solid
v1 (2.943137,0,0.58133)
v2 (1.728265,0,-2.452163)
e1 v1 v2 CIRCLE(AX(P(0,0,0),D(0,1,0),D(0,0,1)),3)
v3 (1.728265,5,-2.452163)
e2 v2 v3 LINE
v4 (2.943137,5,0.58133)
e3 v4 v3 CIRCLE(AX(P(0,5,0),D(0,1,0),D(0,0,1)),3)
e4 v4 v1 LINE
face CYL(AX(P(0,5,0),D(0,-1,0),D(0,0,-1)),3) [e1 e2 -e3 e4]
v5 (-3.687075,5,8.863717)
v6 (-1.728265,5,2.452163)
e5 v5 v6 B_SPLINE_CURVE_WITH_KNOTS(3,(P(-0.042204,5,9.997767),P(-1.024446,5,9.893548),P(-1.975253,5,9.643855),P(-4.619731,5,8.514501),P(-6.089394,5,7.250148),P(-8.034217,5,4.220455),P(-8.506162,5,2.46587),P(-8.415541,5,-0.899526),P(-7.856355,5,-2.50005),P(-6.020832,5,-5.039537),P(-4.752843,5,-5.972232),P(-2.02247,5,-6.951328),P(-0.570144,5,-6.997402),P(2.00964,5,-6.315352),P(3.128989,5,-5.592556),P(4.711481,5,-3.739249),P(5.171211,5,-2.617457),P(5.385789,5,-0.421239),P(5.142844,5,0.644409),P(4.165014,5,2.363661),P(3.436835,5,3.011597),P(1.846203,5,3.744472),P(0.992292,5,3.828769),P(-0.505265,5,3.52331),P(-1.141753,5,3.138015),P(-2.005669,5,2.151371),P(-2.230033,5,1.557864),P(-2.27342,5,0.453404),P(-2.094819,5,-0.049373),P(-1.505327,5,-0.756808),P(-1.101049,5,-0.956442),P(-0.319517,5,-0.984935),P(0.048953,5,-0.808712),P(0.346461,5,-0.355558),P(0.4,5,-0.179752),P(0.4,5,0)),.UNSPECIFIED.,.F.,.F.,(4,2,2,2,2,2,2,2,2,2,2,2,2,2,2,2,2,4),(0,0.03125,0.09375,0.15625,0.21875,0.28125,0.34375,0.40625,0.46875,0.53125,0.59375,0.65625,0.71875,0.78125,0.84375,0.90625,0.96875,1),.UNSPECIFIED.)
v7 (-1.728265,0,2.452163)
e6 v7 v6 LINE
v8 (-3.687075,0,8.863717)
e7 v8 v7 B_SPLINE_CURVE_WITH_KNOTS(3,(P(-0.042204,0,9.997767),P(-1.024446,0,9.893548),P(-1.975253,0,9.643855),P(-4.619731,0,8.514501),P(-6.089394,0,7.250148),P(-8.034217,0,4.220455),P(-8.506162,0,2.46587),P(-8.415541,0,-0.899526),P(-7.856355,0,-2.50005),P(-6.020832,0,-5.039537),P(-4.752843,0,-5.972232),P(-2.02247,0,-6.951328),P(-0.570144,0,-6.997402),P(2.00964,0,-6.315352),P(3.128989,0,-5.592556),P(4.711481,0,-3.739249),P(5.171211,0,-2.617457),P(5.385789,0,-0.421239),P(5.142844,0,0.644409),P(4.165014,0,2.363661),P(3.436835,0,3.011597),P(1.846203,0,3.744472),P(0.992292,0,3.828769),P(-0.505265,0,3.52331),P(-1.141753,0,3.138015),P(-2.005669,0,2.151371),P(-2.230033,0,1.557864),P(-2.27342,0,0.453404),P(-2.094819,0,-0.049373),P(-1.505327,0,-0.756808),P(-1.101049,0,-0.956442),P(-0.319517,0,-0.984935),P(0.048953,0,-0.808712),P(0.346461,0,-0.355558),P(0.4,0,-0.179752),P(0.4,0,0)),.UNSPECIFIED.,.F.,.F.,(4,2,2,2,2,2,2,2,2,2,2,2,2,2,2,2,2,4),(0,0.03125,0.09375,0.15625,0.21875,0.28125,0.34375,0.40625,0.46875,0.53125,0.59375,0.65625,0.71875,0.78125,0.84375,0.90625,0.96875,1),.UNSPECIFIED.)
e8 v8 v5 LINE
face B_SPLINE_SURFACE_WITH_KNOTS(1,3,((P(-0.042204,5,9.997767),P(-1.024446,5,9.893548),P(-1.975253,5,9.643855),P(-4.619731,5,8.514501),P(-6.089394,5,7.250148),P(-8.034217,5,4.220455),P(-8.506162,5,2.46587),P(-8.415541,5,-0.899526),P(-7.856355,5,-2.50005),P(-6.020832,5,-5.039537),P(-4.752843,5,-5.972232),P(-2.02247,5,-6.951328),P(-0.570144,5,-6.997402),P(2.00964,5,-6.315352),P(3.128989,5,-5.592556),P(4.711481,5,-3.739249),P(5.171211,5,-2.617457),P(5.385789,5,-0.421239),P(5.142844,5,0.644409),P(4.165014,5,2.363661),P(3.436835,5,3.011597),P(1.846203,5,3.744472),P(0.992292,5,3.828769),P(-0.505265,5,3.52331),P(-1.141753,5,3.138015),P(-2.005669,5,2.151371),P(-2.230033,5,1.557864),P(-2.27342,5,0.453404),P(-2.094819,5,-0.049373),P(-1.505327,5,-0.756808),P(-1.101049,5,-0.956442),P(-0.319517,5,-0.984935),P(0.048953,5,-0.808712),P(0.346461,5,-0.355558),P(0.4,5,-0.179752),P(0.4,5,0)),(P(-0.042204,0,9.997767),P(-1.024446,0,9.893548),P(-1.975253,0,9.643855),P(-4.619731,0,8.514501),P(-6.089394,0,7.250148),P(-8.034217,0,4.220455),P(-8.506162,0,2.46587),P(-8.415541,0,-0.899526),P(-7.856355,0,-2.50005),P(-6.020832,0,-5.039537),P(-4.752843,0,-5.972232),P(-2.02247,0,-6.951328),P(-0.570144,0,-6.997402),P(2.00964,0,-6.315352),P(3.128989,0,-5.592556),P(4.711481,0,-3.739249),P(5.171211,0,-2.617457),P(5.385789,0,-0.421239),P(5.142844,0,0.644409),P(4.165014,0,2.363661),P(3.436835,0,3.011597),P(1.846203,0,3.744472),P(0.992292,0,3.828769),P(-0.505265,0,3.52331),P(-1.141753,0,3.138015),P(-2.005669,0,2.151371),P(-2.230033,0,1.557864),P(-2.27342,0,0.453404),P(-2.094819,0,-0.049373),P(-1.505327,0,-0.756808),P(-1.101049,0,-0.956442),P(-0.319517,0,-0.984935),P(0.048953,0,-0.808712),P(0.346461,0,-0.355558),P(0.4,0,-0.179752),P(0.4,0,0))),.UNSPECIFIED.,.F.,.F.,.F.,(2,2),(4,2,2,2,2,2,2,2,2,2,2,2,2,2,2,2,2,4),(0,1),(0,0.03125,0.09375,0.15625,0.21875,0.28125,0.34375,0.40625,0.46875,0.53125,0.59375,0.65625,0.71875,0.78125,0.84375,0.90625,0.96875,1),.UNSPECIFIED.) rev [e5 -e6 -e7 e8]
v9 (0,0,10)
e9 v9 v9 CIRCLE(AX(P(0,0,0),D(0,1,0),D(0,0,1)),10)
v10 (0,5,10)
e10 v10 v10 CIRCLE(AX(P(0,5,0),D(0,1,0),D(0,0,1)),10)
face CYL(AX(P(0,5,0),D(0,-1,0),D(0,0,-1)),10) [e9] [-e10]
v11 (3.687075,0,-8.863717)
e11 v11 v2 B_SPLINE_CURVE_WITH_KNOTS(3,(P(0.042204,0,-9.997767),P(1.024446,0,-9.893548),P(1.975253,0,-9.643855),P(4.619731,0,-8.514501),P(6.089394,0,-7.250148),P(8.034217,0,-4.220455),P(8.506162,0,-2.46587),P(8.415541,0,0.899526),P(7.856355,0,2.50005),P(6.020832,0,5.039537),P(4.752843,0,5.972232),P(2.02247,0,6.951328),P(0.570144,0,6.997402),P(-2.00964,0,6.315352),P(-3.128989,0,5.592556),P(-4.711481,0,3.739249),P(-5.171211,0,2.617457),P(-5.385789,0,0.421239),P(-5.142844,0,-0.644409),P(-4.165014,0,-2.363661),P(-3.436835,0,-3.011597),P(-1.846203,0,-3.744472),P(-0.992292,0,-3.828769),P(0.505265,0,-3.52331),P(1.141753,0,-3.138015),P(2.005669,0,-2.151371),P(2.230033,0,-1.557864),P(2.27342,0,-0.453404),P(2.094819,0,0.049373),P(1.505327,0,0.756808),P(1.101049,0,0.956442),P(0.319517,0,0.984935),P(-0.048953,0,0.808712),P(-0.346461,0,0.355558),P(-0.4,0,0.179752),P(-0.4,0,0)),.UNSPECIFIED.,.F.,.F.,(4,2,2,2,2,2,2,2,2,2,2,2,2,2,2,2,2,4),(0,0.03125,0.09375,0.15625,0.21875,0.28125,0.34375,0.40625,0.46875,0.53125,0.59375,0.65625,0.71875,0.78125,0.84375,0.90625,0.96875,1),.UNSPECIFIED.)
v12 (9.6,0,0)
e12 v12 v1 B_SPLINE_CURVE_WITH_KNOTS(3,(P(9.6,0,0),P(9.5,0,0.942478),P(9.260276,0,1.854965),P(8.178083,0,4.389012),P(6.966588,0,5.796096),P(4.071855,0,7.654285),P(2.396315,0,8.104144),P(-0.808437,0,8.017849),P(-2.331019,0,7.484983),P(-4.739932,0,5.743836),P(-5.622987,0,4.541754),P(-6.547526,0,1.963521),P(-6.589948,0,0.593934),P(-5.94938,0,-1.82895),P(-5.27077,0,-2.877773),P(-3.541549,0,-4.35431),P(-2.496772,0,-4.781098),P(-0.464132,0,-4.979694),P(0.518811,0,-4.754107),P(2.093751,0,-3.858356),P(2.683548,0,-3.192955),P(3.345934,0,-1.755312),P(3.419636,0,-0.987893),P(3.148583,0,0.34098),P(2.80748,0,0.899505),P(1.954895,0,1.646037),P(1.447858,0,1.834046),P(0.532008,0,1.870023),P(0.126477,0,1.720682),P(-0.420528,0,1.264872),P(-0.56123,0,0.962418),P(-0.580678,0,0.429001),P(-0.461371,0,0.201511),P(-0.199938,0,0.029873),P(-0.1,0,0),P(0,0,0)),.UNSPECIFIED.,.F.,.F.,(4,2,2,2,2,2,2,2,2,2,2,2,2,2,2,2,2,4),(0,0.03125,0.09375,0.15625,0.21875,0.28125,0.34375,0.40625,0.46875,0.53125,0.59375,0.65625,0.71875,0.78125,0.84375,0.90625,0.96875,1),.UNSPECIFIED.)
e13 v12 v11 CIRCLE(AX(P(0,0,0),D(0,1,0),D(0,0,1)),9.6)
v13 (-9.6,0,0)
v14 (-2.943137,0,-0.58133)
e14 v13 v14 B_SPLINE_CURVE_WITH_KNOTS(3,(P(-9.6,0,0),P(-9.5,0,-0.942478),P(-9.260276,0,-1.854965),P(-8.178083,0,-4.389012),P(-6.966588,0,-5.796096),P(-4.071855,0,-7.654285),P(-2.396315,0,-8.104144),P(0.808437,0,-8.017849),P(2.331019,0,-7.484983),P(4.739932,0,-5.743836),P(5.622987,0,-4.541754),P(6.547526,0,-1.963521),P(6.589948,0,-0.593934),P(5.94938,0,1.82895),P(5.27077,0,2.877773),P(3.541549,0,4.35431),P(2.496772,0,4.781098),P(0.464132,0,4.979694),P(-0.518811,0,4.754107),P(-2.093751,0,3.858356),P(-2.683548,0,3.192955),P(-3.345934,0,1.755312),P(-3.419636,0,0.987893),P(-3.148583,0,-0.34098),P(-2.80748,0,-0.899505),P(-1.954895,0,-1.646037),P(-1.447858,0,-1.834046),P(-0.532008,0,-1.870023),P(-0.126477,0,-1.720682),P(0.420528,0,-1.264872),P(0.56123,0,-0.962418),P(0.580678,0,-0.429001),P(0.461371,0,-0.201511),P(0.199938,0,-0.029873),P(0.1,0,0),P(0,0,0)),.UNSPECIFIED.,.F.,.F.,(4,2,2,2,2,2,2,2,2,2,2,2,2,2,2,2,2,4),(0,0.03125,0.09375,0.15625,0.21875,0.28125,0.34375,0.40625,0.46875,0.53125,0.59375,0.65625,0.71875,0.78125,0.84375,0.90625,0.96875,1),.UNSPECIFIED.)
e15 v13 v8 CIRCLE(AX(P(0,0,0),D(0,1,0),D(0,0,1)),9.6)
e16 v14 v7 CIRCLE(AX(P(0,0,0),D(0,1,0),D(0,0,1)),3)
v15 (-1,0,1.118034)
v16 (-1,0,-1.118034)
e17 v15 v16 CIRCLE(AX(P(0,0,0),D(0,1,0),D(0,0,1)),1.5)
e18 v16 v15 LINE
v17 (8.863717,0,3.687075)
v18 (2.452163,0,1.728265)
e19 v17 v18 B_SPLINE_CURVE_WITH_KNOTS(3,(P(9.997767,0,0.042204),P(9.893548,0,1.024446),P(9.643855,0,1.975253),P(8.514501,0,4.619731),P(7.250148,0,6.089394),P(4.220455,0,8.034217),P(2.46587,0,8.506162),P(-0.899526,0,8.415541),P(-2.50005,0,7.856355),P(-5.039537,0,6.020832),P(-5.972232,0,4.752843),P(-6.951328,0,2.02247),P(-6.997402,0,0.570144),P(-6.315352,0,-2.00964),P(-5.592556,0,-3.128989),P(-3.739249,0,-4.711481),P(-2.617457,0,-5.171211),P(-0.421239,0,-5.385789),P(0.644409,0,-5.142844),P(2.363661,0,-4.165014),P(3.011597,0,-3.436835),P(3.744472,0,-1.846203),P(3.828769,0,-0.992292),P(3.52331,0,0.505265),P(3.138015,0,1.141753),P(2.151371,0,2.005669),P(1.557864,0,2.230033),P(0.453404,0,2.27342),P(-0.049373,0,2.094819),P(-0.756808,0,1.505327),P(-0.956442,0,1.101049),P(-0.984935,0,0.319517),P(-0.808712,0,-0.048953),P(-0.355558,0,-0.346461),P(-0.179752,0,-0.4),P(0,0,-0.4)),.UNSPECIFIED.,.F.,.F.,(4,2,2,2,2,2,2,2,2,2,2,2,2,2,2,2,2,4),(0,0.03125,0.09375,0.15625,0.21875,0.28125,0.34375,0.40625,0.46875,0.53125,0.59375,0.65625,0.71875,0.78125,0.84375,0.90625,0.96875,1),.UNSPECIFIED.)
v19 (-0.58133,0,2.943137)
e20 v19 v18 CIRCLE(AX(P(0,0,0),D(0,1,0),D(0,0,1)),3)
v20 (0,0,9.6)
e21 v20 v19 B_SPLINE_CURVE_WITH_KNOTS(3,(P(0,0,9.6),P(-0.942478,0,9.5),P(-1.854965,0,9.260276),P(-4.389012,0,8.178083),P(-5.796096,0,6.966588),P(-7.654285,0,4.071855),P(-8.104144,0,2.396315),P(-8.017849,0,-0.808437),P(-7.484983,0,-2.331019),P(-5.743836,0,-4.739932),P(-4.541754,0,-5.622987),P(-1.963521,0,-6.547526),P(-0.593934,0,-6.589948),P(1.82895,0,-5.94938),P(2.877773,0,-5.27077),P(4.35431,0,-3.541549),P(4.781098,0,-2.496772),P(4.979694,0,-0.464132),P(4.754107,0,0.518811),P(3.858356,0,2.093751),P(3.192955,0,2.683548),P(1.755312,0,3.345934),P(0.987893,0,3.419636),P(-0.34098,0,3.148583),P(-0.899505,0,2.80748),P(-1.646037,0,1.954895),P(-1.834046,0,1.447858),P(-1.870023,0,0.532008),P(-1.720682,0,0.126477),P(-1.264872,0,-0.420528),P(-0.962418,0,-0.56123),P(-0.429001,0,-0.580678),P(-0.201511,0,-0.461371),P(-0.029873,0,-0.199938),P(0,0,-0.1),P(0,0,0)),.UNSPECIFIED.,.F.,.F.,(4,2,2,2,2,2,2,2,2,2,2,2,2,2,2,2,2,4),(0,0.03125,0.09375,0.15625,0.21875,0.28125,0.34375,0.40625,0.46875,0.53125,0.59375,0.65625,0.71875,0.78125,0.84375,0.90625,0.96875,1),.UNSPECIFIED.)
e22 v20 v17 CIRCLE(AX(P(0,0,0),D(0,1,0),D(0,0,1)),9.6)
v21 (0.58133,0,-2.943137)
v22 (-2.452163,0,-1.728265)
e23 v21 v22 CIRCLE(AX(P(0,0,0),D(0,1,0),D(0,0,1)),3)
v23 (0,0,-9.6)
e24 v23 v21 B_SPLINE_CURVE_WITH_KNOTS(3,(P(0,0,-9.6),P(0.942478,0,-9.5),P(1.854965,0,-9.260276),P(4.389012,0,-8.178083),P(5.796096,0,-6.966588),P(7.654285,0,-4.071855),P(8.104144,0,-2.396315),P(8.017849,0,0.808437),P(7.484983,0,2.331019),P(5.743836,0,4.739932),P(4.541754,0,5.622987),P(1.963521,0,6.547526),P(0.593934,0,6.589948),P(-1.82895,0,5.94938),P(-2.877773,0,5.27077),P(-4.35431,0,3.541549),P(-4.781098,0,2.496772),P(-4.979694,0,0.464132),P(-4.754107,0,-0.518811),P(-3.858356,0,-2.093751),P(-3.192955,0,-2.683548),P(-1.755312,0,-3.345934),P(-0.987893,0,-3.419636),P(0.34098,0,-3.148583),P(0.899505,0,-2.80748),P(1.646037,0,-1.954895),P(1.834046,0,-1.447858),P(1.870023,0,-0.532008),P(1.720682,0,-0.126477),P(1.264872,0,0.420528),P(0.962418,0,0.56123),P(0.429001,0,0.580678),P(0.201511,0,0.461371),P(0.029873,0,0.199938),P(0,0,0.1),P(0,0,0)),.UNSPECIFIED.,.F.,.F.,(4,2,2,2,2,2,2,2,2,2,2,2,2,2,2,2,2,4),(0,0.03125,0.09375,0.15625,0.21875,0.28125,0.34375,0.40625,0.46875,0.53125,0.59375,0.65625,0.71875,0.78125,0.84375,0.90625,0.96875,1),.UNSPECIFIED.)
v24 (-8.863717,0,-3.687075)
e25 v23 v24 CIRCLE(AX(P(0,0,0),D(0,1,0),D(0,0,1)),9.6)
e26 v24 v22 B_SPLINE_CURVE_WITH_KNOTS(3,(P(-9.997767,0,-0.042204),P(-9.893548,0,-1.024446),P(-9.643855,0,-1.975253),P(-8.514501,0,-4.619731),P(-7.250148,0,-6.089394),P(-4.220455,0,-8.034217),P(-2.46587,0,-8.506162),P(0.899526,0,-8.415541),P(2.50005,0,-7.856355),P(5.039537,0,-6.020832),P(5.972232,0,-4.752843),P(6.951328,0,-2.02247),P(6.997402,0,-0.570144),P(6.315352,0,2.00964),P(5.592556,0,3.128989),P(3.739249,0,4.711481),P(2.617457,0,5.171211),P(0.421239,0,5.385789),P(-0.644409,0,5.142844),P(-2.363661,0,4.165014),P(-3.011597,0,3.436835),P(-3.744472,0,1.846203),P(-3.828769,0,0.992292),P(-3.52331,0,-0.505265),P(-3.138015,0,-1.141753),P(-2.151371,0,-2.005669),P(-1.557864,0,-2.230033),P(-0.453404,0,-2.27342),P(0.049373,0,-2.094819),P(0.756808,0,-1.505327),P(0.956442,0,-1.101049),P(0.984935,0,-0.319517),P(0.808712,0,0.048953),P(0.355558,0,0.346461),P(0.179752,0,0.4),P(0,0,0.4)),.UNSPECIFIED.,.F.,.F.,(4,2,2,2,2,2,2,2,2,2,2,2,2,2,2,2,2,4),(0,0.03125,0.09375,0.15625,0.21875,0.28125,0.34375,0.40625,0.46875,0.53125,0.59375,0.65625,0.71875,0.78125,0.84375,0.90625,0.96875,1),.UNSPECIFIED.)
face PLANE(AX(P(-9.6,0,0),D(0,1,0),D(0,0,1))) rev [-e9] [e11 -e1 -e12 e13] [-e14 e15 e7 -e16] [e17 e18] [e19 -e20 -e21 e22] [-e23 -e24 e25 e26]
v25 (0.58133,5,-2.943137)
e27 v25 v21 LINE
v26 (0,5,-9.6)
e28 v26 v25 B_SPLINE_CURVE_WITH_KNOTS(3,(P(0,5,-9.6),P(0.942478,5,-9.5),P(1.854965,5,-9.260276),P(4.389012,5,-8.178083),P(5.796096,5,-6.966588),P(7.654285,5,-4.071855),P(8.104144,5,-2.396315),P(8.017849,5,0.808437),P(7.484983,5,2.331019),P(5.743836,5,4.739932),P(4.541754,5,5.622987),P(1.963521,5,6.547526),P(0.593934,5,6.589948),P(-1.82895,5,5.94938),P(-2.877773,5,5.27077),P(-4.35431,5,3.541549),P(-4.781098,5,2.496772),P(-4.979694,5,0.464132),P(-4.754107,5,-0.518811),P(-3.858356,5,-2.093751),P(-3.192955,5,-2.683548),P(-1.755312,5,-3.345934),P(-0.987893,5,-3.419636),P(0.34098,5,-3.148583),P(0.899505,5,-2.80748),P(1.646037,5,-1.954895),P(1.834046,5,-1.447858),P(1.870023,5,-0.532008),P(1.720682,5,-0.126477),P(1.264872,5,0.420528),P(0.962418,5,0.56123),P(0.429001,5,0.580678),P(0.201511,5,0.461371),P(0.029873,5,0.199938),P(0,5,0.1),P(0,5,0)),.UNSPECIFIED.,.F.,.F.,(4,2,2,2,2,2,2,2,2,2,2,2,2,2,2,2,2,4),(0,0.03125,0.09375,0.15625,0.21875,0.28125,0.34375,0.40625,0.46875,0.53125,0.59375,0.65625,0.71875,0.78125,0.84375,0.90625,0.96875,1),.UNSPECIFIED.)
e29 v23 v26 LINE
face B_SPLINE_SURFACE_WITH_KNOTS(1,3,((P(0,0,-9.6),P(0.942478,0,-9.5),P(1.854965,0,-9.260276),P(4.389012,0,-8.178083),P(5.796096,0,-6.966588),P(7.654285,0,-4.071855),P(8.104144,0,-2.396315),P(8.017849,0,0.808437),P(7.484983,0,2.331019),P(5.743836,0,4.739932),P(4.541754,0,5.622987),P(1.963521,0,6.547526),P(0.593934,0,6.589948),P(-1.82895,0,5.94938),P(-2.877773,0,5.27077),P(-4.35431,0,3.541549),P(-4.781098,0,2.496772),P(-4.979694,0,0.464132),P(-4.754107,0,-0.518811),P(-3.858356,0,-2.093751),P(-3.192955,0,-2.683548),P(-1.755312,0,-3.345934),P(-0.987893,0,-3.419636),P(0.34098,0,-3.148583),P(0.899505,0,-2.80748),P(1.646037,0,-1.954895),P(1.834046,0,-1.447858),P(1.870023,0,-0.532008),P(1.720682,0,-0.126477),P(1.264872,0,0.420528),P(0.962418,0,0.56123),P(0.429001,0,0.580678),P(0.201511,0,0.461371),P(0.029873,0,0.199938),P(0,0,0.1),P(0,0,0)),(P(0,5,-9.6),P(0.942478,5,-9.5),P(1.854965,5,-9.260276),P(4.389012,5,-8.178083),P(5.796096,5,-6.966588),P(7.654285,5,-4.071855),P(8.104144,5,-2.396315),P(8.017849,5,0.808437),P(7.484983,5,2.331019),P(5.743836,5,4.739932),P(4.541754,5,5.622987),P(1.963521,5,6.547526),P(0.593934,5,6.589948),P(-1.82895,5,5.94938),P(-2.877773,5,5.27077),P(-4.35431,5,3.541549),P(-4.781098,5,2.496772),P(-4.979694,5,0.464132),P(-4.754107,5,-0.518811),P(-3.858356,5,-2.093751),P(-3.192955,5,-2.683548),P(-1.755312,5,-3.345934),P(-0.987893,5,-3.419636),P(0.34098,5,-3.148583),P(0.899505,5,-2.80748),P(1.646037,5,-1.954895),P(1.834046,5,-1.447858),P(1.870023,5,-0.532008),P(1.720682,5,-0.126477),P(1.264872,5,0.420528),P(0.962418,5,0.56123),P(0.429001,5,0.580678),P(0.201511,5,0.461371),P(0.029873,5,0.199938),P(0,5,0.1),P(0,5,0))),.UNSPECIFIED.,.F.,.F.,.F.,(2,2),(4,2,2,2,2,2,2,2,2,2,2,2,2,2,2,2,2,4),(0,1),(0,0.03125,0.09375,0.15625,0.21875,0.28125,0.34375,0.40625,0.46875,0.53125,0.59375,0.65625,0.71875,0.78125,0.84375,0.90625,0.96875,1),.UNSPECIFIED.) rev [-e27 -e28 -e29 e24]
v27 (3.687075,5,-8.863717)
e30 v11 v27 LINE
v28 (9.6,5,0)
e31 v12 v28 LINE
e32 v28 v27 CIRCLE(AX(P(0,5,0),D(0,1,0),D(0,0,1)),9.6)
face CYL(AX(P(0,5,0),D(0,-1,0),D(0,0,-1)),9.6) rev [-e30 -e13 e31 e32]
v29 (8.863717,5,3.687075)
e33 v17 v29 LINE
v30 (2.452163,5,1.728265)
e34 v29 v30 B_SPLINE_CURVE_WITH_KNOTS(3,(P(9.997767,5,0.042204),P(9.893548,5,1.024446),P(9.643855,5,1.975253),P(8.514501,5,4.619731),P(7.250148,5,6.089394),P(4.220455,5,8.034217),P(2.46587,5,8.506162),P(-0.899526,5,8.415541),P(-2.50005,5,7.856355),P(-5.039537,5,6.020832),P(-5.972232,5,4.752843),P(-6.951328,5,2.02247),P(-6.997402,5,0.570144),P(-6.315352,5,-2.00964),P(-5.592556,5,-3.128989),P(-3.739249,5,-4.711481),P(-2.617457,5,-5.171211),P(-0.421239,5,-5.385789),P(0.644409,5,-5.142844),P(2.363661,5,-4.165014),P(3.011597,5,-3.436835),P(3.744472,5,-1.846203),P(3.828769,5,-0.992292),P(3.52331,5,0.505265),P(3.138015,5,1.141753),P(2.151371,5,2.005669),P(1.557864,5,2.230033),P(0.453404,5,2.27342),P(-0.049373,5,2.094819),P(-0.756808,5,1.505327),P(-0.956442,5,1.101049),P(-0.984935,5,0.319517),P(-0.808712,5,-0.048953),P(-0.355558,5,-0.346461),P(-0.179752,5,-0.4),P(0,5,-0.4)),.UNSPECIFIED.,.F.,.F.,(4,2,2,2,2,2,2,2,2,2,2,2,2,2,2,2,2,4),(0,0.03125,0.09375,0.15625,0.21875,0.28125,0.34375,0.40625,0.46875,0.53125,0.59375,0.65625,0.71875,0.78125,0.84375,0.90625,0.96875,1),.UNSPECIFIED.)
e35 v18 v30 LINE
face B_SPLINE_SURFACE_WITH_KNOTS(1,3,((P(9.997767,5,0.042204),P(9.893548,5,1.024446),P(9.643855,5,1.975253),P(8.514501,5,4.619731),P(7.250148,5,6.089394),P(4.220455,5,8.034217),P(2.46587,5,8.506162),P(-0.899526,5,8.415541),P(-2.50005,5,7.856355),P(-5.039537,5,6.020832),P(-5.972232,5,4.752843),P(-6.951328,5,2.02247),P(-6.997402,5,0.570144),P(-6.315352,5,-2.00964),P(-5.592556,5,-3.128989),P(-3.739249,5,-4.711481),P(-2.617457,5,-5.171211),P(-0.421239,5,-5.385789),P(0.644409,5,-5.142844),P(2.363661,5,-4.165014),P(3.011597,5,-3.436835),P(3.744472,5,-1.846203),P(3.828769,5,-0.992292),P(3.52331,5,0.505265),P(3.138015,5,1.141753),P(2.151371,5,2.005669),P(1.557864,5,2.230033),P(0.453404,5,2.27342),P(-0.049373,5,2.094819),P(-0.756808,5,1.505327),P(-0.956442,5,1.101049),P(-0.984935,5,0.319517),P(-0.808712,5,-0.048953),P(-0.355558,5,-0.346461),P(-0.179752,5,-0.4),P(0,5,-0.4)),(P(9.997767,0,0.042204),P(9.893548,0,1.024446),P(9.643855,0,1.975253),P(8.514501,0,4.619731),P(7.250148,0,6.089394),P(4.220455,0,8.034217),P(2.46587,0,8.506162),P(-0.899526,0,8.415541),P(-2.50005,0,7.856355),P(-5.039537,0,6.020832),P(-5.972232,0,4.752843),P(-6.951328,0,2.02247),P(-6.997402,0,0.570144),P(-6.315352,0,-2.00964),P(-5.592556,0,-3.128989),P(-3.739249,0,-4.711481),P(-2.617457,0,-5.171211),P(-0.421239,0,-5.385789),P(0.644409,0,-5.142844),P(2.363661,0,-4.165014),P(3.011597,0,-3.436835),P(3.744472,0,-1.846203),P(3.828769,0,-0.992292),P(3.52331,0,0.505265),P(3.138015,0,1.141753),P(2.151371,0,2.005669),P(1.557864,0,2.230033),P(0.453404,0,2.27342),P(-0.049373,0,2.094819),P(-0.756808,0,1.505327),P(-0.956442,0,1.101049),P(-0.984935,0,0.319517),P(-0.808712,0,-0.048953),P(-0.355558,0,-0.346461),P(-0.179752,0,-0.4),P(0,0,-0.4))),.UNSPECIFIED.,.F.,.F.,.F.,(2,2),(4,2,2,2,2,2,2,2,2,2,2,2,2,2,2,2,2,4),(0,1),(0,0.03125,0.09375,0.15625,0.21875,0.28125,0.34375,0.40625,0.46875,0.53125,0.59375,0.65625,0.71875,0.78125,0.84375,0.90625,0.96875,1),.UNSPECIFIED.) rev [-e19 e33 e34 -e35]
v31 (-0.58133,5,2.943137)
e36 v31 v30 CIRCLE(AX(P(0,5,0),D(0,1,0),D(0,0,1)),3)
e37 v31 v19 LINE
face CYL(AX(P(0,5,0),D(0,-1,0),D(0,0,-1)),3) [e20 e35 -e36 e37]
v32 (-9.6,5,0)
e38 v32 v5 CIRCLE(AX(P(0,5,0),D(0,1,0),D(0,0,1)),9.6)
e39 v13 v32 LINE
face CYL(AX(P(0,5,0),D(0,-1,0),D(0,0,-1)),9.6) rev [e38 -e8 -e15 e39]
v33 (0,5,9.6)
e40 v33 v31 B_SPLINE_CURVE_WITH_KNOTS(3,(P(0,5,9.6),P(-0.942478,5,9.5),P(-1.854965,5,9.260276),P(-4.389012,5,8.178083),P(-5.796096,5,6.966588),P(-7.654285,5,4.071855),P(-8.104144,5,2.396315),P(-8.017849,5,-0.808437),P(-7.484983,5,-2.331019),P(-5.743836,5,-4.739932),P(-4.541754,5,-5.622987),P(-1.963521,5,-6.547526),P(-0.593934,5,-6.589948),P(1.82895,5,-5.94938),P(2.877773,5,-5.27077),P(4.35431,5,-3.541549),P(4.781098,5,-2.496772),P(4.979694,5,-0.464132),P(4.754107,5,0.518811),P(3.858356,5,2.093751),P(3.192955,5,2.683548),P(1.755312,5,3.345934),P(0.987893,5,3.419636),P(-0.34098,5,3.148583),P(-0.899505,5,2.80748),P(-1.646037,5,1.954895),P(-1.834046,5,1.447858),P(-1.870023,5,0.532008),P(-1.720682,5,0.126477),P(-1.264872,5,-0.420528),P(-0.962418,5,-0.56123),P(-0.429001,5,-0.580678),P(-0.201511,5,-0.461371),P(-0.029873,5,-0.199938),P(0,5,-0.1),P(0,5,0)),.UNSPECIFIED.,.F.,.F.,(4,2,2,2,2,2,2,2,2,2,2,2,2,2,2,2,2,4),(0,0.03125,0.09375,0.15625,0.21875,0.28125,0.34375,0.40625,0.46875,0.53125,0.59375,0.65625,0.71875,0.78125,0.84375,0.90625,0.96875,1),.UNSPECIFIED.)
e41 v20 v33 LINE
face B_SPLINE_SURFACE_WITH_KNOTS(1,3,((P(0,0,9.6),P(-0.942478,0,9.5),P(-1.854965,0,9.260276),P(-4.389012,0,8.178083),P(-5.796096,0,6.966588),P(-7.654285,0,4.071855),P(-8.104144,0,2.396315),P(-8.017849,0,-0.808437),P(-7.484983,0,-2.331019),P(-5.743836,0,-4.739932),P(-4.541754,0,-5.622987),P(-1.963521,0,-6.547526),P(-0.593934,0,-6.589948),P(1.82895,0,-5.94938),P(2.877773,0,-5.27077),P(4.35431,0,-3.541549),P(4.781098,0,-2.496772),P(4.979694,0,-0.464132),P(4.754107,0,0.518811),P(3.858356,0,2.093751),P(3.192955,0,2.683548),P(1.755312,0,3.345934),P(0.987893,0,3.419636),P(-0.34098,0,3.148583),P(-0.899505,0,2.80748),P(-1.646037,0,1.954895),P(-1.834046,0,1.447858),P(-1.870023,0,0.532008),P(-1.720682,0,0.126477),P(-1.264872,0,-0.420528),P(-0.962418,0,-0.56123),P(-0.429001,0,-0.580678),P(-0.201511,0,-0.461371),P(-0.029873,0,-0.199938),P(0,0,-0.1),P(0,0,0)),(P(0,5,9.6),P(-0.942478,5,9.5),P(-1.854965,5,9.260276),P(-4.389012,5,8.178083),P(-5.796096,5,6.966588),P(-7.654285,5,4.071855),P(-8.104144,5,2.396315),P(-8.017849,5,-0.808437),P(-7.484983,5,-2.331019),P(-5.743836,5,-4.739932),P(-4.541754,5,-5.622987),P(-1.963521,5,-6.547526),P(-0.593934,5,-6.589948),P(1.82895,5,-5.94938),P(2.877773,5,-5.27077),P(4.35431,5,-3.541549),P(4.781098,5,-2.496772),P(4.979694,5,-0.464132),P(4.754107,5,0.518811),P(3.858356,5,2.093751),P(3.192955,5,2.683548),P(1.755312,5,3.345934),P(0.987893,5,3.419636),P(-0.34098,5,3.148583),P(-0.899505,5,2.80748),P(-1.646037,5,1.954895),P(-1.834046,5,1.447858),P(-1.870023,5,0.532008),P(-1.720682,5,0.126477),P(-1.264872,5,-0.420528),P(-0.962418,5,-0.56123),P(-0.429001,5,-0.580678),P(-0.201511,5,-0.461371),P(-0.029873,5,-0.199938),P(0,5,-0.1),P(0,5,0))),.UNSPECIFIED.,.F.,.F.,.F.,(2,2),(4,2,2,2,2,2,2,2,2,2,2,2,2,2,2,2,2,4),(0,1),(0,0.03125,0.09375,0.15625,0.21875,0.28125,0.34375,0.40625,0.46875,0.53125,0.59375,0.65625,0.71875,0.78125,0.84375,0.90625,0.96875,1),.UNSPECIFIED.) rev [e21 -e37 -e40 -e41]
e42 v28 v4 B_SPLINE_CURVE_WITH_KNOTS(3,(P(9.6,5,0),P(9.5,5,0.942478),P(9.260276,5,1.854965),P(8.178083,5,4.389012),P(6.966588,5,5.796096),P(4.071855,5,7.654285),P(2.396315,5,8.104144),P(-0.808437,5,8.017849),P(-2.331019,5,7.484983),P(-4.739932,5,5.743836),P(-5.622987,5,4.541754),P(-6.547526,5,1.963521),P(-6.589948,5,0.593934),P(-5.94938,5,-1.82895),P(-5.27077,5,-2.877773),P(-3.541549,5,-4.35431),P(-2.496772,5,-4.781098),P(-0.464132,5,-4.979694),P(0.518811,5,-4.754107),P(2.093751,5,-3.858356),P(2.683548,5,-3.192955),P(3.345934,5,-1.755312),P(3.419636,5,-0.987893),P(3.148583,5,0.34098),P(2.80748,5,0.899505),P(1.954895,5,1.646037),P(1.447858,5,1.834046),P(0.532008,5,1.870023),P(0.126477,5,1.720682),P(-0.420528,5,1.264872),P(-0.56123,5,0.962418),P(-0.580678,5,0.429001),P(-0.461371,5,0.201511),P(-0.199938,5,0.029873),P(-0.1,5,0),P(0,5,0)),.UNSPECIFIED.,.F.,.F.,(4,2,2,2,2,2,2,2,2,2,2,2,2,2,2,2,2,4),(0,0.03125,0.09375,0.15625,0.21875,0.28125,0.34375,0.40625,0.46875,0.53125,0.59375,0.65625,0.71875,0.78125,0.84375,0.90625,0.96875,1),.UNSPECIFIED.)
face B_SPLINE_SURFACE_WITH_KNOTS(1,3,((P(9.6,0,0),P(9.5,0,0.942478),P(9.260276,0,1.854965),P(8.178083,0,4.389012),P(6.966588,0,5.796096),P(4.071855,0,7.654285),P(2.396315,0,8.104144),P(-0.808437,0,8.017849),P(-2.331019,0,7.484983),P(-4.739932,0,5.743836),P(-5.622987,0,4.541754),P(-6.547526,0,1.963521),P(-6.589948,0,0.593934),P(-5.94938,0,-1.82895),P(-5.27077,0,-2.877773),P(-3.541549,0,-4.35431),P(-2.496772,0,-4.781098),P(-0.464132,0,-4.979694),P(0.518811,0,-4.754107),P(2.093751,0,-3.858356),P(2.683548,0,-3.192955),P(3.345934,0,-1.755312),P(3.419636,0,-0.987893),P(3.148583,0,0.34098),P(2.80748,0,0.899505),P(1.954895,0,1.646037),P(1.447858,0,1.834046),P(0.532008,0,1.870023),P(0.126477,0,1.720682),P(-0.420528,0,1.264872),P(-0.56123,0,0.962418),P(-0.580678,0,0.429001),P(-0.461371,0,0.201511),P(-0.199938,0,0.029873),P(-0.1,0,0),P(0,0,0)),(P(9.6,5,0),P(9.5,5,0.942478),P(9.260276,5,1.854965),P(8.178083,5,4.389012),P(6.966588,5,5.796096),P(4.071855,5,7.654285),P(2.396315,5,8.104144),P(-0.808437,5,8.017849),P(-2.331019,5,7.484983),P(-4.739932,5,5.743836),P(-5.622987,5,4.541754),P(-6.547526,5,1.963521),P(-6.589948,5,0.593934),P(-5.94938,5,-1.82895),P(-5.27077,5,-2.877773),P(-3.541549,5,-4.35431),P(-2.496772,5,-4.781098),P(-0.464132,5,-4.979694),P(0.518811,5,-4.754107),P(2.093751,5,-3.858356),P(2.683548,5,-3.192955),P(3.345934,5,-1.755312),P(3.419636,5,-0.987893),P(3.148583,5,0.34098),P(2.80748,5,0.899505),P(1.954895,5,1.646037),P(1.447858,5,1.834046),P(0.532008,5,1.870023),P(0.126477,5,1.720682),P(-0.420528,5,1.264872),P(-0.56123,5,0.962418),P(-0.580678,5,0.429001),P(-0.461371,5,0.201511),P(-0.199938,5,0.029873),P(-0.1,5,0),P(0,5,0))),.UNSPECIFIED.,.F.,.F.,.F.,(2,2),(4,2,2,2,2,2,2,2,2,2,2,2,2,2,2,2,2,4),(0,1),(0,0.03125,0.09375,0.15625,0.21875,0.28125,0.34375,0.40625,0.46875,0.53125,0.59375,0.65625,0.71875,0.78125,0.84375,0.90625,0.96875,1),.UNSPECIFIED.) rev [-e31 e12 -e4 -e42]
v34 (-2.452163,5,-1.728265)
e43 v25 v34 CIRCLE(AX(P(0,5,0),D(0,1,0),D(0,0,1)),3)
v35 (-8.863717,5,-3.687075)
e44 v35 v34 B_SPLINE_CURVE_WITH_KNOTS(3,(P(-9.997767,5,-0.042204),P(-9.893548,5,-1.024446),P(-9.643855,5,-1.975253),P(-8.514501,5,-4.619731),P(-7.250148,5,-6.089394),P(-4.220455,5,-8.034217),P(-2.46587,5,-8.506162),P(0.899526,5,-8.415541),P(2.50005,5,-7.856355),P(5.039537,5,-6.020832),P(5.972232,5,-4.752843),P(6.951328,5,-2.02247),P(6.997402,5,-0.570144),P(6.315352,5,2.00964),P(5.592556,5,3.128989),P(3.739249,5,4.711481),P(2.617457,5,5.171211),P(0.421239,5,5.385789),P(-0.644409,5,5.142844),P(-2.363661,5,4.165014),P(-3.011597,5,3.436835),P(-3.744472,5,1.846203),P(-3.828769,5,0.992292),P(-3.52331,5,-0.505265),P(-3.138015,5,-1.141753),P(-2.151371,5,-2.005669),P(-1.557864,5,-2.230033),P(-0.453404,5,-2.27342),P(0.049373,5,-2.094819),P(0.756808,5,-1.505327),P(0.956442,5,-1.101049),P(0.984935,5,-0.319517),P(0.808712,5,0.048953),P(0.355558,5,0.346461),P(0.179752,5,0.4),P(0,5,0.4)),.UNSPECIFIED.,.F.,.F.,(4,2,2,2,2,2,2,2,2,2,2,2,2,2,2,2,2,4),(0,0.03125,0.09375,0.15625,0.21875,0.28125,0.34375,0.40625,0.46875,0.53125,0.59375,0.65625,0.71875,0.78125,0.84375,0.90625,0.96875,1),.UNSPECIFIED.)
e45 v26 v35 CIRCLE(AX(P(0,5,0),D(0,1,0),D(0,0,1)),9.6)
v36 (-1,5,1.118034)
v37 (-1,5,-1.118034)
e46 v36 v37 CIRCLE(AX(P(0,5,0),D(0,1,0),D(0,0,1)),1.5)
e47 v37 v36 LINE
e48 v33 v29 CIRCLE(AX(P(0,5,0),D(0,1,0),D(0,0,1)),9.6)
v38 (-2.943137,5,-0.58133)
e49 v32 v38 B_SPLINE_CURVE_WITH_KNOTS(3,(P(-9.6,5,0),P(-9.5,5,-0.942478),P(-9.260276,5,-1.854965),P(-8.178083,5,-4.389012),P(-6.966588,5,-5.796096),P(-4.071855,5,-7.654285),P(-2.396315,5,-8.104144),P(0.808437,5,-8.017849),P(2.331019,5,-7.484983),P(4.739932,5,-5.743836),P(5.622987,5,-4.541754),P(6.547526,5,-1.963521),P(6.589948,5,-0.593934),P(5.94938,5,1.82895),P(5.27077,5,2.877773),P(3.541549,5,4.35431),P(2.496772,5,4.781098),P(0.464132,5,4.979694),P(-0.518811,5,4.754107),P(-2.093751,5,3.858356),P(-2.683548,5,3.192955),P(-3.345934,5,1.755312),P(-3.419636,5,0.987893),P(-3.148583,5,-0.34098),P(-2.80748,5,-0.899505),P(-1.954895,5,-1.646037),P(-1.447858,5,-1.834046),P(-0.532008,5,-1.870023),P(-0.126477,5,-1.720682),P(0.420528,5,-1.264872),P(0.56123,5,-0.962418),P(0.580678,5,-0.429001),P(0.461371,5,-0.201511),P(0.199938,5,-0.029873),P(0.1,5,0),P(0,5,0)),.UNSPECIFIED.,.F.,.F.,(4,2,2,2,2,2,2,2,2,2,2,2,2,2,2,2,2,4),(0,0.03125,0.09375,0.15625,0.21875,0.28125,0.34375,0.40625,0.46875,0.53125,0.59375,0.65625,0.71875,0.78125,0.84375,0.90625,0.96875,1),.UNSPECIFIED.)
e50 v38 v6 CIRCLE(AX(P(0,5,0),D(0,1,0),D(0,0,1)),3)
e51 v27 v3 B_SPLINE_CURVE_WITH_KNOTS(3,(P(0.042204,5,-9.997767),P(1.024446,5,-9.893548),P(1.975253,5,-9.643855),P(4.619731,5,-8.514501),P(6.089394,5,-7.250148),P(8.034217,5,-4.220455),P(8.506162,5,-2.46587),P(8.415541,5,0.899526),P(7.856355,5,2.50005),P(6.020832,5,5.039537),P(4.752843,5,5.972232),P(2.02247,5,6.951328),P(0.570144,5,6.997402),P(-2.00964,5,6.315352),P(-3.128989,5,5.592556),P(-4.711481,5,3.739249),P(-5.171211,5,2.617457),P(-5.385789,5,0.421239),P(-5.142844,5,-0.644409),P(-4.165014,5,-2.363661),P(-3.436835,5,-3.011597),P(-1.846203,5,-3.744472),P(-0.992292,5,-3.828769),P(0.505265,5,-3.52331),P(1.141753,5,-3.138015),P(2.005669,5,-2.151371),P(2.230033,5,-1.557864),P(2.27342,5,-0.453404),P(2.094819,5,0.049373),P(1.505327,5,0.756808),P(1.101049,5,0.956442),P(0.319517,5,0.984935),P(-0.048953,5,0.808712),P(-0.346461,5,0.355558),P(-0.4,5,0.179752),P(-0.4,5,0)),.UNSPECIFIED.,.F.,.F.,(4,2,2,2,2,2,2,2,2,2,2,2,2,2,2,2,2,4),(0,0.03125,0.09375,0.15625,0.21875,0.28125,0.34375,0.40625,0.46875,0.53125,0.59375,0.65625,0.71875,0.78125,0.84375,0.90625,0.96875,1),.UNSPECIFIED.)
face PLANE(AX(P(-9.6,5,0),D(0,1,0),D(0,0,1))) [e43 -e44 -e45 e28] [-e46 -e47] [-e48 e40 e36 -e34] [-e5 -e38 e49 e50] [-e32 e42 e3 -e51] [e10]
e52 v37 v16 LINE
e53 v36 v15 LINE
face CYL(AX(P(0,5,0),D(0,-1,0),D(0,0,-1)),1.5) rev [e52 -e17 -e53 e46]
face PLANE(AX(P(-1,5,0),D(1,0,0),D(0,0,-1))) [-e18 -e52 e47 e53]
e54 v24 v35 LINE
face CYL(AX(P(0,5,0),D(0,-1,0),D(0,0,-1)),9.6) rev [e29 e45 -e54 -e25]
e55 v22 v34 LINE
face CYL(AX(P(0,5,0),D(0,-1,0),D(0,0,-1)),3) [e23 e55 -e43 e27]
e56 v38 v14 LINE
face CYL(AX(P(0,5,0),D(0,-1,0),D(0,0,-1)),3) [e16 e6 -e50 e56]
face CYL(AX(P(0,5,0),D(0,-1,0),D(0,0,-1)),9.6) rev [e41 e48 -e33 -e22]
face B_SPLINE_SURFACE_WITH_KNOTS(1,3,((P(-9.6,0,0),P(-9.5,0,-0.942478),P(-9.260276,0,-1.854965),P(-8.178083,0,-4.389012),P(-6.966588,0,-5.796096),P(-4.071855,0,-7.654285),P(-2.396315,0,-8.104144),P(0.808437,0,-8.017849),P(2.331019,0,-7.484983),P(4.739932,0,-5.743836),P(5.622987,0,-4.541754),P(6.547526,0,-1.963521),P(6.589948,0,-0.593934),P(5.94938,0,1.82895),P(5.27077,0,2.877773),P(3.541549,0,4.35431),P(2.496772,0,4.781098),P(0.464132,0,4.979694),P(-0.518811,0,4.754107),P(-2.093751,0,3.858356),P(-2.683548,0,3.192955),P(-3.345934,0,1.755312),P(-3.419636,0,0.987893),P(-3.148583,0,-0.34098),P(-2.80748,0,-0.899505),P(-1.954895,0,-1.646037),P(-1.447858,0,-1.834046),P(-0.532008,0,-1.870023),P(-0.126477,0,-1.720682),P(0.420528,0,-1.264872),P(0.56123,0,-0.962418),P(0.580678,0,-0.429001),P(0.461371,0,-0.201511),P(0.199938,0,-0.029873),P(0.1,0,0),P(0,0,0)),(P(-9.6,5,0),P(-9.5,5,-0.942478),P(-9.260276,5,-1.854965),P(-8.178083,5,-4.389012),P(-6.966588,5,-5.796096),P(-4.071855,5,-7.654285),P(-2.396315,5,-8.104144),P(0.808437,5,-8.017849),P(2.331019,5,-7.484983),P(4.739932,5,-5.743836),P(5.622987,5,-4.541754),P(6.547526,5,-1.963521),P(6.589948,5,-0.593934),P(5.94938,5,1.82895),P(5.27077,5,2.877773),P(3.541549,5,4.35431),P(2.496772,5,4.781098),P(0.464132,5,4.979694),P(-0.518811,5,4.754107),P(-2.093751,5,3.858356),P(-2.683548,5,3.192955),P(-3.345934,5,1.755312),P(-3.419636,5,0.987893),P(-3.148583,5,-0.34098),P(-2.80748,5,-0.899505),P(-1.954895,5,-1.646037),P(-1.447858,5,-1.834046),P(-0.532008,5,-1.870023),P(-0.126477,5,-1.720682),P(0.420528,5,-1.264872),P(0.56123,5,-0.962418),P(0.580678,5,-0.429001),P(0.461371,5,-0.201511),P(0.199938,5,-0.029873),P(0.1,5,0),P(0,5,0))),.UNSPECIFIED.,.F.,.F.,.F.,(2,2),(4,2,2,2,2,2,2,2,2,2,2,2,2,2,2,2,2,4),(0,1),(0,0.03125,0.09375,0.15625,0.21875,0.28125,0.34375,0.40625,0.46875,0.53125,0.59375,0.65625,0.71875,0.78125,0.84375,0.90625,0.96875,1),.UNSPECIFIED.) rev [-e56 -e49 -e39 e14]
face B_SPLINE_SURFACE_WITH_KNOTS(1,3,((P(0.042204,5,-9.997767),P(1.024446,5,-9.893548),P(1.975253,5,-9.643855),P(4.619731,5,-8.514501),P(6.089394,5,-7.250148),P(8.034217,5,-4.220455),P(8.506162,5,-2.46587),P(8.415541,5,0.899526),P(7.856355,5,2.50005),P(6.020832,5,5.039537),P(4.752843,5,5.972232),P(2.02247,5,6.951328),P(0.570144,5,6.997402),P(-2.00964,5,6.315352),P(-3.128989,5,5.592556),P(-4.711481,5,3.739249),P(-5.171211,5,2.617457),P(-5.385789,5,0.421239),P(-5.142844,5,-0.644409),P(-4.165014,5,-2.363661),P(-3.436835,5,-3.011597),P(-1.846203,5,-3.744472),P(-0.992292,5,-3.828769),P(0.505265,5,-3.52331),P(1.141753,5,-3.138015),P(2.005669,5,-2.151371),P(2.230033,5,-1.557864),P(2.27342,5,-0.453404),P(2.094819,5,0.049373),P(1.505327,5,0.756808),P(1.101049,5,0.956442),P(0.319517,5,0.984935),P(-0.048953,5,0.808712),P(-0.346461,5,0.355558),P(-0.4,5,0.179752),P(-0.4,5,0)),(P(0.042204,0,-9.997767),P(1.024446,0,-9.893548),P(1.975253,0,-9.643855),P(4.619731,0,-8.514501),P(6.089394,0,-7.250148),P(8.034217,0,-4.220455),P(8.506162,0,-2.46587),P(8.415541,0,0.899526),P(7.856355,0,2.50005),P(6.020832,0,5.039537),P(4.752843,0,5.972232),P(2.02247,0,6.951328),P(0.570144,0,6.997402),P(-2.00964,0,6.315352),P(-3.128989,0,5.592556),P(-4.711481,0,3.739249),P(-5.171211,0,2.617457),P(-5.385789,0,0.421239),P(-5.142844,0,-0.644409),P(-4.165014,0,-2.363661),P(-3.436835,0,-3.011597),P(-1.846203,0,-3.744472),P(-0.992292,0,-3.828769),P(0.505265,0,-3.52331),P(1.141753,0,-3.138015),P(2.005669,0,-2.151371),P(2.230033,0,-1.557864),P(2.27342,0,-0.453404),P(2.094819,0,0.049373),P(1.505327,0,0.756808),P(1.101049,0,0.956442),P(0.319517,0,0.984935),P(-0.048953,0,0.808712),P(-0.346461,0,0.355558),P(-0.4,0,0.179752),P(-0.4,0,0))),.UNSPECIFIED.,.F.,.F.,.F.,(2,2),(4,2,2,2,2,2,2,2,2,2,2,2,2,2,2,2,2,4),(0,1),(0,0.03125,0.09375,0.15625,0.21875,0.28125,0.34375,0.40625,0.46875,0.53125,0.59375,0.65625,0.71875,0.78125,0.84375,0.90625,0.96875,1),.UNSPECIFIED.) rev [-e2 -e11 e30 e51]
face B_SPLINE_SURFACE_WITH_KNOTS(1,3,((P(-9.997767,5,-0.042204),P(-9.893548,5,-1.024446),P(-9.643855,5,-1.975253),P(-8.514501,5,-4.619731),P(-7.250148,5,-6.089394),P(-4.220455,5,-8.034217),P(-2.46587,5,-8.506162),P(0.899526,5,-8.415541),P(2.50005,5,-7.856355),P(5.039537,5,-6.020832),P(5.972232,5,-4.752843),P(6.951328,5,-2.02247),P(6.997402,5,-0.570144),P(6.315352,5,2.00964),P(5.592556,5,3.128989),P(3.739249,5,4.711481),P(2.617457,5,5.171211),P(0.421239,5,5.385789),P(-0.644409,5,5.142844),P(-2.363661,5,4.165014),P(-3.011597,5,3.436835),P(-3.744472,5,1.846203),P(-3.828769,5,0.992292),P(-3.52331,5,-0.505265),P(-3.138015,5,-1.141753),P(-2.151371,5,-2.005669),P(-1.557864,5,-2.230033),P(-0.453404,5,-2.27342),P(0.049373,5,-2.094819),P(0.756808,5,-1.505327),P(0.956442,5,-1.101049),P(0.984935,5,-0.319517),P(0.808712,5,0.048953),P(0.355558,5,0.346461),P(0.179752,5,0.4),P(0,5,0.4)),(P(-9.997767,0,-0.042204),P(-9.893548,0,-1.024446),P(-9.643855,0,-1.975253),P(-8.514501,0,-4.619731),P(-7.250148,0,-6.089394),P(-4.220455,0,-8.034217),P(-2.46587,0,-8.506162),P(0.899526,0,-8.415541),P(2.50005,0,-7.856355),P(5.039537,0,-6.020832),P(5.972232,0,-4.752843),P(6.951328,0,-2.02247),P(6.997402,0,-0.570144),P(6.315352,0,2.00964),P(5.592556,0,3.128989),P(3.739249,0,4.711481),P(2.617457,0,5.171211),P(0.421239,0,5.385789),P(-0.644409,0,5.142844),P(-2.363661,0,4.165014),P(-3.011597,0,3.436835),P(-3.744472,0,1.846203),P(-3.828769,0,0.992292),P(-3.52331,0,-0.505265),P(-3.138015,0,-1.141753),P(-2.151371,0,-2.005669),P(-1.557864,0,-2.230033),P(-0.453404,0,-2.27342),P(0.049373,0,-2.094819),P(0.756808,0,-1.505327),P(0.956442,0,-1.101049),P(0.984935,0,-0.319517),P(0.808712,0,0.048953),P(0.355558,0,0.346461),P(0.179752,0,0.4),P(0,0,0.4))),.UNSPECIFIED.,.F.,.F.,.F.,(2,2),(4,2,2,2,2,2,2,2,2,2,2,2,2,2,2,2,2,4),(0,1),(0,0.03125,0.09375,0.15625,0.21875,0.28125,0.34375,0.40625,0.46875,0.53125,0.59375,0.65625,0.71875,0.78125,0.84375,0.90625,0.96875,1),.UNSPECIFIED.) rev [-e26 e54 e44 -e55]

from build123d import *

# Parameters (mm, degrees)
SWEEP1_DEPTH        = 5
CIRPATTERN1_COUNT   = 4
SKETCH1_R           = 10
SKETCH1_R_2         = 9.6
SKETCH1_R_3         = 3
SKETCH1_R_4         = 1.5
BOSS_EXTRUDE1_DEPTH = 5
CUT_EXTRUDE1_DEPTH  = 5


# Read off the part's stored shape, not the designer's step: Sweep1
with BuildPart() as part:
    # Sweep1 outline → Sweep1 (new body)
    with BuildSketch(Plane(origin=(0, 0, 0), x_dir=(1, 0, 0), z_dir=(0, 1, 0))):
        with BuildLine():
            add(Edge.make_bspline(
                [(-9.997767253, 0.042204416), (-9.893548222, 1.024445624), (-9.643855436, 1.975253332), (-8.514500953, 4.619730854), (-7.250148261, 6.089394307), (-4.220454712, 8.034217024), (-2.465869735, 8.506161552), (0.899525972, 8.415541149), (2.500050194, 7.856354951), (5.039536559, 6.020831642), (5.972232345, 4.75284276), (6.951327861, 2.022470319), (6.997401809, 0.570143689), (6.315351727, -2.009640106), (5.592555924, -3.128989147), (3.739249202, -4.711480962), (2.61745741, -5.171210965), (0.421238612, -5.385789198), (-0.6444086, -5.14284378), (-2.363661266, -4.165013808), (-3.011596763, -3.436835308), (-3.744471685, -1.846203068), (-3.828769264, -0.992292459), (-3.523310038, 0.505264712), (-3.138015362, 1.141752965), (-2.151370993, 2.005668845), (-1.557863942, 2.230032974), (-0.453404495, 2.27341979), (0.04937349, 2.094819441), (0.756807528, 1.505326697), (0.956441656, 1.101049011), (0.984935122, 0.319516548), (0.808711828, -0.048952614), (0.355558233, -0.346460579), (0.179752495, -0.399999938), (0, -0.4)],
                knots=[0, 0, 0, 0, 0.03125, 0.03125, 0.09375, 0.09375, 0.15625, 0.15625, 0.21875, 0.21875, 0.28125, 0.28125, 0.34375, 0.34375, 0.40625, 0.40625, 0.46875, 0.46875, 0.53125, 0.53125, 0.59375, 0.59375, 0.65625, 0.65625, 0.71875, 0.71875, 0.78125, 0.78125, 0.84375, 0.84375, 0.90625, 0.90625, 0.96875, 0.96875, 1, 1, 1, 1], degree=3))
            Line((-9.997767253, 0.042204416), (-9.6, 0))
            add(Edge.make_bspline(
                [(-9.6, 0), (-9.500000002, 0.942477768), (-9.260276395, 1.854965201), (-8.178082578, 4.389012093), (-6.966588285, 5.79609643), (-4.07185486, 7.654285459), (-2.396315093, 8.104143661), (0.80843742, 8.017848911), (2.331018658, 7.48498264), (4.739932394, 5.743836325), (5.622987086, 4.541754089), (6.547526362, 1.963520879), (6.589948056, 0.593934112), (5.949379501, -1.82895008), (5.270769692, -2.877772985), (3.541549476, -4.354310455), (2.496772138, -4.781097682), (0.46413157, -4.979693743), (-0.518811459, -4.754107144), (-2.093750636, -3.858355877), (-2.683547792, -3.192955292), (-3.345933745, -1.755312325), (-3.419635874, -0.987893302), (-3.148583322, 0.340980176), (-2.807479524, 0.899505485), (-1.954895304, 1.646036894), (-1.447858478, 1.834045854), (-0.532007817, 1.870023456), (-0.1264769, 1.720682196), (0.420528321, 1.264871984), (0.561230213, 0.962417719), (0.580677698, 0.429001097), (0.461370534, 0.201510606), (0.199937884, 0.029872802), (0.099999829, 1.9e-08), (0, 0)],
                knots=[0, 0, 0, 0, 0.03125, 0.03125, 0.09375, 0.09375, 0.15625, 0.15625, 0.21875, 0.21875, 0.28125, 0.28125, 0.34375, 0.34375, 0.40625, 0.40625, 0.46875, 0.46875, 0.53125, 0.53125, 0.59375, 0.59375, 0.65625, 0.65625, 0.71875, 0.71875, 0.78125, 0.78125, 0.84375, 0.84375, 0.90625, 0.90625, 0.96875, 0.96875, 1, 1, 1, 1], degree=3))
            Line((0, 0), (0, -0.4))
        make_face()
    sweep1 = extrude(amount=SWEEP1_DEPTH)

    # CirPattern1: Sweep1 ×4 about axis
    cirpattern1_axis = Axis((0, 0, 0), (0, 1, 0))
    for i in range(1, CIRPATTERN1_COUNT):
        add(sweep1.rotate(cirpattern1_axis, i * 360 / CIRPATTERN1_COUNT))

    # Sketch1 → Boss-Extrude1 (add)
    # profile 1 of 3: a face of its own
    with BuildSketch(Plane(origin=(0, 0, 0), x_dir=(1, 0, 0), z_dir=(0, 1, 0))):
        with Locations(Location((0, 0, 0), (0, 0, 270))):
            Circle(SKETCH1_R)
        Circle(SKETCH1_R_2, mode=Mode.SUBTRACT)
    # profile 2 of 3: a face of its own
    with BuildSketch(Plane(origin=(0, 0, 0), x_dir=(1, 0, 0), z_dir=(0, 1, 0))):
        Circle(SKETCH1_R_3)
        Circle(SKETCH1_R_4, mode=Mode.SUBTRACT)
    # profile 3 of 3: a face of its own
    with BuildSketch(Plane(origin=(0, 0, 0), x_dir=(1, 0, 0), z_dir=(0, 1, 0))):
        with BuildLine():
            Line((-1, 0), (-1, 1.118033989))
            ThreePointArc((-1, 1.118033989), (-1.5, 0), (-1, -1.118033989))
            Line((-1, -1.118033989), (-1, 0))
        make_face()
    extrude(amount=BOSS_EXTRUDE1_DEPTH)

    # Sketch1<3> → Cut-Extrude1 (cut)
    with BuildSketch(Plane(origin=(0, 0, 0), x_dir=(1, 0, 0), z_dir=(0, 1, 0))):
        with BuildLine():
            ThreePointArc((1.5, 0), (0.612372436, 1.369306394), (-1, 1.118033989))
            Line((-1, 1.118033989), (-1, 0))
            Line((-1, 0), (-1, -1.118033989))
            ThreePointArc((-1, -1.118033989), (0.612372436, -1.369306394), (1.5, 0))
        make_face()
    extrude(amount=CUT_EXTRUDE1_DEPTH, mode=Mode.SUBTRACT)


solid = part.part
